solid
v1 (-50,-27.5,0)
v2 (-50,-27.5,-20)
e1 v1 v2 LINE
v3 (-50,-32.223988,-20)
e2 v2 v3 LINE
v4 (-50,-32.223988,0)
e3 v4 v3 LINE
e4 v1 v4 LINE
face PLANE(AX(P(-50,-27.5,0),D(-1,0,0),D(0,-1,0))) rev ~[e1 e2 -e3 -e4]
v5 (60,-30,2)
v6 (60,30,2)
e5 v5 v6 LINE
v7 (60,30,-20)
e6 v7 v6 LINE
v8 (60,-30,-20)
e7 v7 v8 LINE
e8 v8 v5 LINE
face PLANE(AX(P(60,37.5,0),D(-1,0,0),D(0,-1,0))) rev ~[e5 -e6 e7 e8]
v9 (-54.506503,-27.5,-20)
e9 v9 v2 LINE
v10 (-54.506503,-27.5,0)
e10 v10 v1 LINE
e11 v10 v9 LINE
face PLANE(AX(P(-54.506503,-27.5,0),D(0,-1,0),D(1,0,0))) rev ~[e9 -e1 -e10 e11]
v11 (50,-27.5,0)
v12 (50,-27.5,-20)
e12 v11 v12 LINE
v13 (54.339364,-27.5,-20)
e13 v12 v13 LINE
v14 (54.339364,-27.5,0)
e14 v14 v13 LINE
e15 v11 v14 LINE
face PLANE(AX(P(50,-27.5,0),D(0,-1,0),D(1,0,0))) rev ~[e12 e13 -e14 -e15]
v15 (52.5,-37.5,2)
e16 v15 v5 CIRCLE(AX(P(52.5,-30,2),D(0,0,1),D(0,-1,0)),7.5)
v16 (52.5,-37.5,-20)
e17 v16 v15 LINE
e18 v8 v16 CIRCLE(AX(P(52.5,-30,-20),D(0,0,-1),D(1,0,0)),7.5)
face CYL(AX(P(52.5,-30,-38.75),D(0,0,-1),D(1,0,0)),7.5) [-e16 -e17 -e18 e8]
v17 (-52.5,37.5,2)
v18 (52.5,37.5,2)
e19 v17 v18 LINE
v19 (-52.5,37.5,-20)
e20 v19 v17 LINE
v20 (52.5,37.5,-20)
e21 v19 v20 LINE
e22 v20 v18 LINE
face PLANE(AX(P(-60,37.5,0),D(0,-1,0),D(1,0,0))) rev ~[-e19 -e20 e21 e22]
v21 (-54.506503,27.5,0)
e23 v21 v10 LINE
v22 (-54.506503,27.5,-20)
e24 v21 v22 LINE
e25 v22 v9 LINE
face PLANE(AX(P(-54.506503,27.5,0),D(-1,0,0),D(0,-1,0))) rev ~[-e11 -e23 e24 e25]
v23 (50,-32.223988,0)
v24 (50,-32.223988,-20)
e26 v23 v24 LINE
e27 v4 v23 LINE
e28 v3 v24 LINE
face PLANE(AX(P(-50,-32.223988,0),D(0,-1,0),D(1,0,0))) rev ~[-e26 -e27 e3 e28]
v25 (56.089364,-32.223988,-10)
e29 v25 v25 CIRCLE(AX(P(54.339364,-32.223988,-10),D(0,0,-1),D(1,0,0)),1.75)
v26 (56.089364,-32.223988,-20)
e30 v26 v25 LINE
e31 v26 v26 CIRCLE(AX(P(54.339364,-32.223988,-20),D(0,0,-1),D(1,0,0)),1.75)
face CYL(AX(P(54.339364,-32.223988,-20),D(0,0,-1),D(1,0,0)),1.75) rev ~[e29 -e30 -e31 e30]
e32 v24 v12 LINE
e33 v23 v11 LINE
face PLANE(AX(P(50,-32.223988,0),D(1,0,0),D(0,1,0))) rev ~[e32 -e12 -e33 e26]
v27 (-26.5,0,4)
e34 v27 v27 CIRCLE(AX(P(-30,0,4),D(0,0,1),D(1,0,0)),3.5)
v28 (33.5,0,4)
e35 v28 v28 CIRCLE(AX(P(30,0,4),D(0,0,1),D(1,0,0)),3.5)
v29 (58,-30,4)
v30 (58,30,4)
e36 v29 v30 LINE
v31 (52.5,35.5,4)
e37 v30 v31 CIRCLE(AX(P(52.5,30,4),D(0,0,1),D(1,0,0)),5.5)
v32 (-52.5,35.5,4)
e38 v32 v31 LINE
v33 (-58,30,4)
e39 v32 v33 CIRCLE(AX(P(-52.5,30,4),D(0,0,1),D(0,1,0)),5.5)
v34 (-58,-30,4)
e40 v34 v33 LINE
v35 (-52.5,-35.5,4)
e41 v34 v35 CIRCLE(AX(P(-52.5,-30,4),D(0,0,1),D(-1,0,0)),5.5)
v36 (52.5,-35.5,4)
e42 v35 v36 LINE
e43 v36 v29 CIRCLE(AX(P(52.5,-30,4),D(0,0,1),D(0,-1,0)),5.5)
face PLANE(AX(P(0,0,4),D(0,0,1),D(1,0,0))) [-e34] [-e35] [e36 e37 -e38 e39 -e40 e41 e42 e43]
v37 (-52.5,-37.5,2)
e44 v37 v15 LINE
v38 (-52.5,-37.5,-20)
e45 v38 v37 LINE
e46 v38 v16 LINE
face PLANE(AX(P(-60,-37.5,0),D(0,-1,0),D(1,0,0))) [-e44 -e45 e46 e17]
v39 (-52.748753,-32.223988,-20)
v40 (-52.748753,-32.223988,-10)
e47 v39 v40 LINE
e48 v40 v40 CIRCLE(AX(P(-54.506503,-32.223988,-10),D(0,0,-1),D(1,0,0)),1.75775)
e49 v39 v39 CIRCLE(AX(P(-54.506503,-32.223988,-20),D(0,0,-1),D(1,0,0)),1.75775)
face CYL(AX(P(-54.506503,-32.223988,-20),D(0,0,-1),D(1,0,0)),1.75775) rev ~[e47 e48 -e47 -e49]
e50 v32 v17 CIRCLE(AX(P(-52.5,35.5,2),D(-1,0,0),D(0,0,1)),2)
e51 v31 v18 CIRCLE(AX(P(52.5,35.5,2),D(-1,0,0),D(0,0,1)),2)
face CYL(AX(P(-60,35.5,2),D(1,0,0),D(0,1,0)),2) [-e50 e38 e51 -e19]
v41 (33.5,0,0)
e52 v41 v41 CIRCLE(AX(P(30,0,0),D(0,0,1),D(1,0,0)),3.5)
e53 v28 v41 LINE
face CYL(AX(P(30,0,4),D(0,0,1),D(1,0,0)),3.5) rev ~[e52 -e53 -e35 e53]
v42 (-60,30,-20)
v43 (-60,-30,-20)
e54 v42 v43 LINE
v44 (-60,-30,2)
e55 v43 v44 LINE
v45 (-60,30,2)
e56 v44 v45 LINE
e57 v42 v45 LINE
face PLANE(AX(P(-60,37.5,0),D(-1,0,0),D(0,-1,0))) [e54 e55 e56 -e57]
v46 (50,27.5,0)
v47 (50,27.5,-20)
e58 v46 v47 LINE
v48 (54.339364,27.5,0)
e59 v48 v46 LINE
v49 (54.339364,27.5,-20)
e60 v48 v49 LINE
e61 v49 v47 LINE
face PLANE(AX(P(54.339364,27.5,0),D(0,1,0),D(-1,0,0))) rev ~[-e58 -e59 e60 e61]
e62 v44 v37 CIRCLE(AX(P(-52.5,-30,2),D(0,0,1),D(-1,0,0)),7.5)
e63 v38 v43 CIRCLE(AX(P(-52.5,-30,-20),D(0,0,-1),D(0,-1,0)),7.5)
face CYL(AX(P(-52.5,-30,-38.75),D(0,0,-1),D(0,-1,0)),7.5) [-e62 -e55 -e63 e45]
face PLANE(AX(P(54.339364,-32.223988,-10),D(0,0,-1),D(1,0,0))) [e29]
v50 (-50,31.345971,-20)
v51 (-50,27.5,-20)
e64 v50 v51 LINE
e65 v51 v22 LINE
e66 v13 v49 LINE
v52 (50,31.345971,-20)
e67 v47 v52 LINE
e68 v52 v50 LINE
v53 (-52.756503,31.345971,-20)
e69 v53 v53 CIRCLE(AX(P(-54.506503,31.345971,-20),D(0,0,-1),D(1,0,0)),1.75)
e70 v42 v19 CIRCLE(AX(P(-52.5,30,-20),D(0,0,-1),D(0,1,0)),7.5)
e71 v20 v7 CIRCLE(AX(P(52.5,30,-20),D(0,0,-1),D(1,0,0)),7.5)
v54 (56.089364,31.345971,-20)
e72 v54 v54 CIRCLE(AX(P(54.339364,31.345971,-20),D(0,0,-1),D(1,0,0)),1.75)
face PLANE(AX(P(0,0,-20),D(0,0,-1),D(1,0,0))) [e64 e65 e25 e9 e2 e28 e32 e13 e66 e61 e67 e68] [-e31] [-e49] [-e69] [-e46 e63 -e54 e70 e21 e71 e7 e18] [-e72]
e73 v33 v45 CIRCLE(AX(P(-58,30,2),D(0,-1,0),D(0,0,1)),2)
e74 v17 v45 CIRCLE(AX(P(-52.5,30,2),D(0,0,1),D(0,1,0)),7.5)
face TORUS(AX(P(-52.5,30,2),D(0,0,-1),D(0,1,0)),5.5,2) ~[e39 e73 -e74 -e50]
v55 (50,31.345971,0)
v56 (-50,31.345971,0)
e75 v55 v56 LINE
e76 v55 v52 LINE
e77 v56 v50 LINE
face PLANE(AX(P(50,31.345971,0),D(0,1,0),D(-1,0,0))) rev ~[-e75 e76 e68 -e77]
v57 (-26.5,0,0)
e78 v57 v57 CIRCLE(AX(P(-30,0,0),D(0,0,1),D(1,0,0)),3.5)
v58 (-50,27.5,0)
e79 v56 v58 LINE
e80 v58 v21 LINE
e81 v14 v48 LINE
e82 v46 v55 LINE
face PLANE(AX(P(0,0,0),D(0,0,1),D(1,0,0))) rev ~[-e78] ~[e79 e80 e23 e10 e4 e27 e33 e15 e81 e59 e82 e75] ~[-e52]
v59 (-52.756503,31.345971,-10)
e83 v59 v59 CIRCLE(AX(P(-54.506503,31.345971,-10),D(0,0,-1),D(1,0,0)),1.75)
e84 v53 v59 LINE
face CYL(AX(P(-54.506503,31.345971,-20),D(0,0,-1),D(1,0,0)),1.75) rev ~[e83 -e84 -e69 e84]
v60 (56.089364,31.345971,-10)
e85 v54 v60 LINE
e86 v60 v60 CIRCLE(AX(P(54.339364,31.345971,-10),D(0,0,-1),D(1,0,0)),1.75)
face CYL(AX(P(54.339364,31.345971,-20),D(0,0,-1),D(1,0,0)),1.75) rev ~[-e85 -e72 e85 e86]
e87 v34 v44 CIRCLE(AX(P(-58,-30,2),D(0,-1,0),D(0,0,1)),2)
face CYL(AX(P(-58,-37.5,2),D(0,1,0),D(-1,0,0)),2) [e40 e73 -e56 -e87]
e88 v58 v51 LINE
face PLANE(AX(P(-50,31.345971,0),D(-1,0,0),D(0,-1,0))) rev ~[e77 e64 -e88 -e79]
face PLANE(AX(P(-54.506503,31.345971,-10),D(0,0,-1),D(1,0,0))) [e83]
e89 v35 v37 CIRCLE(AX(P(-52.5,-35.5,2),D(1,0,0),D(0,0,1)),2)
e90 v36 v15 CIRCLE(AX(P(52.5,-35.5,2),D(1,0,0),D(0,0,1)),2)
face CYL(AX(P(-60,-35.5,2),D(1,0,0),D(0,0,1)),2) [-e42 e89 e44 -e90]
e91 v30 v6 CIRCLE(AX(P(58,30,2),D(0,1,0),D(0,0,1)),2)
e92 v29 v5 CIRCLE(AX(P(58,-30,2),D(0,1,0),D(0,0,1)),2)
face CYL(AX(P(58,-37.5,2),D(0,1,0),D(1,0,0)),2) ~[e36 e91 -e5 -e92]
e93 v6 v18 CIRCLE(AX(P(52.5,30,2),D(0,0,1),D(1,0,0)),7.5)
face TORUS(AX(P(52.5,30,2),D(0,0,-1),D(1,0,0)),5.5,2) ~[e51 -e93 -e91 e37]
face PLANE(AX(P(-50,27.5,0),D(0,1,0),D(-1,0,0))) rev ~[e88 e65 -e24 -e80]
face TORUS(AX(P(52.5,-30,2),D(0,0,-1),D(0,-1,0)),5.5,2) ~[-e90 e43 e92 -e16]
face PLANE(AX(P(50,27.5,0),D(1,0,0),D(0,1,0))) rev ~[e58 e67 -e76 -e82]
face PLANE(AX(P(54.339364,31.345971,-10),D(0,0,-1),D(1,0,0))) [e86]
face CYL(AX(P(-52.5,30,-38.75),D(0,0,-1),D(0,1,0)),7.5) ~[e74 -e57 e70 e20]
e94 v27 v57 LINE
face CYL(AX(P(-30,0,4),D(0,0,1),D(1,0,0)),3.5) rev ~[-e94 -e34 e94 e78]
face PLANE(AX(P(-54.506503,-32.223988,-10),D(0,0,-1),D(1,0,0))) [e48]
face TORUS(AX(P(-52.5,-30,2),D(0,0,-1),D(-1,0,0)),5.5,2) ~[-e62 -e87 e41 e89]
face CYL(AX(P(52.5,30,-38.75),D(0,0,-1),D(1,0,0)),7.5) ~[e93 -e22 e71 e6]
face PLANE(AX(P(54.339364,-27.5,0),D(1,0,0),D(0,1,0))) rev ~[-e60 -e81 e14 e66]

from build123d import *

# Parameters (mm, degrees)
F0_W         = 120
F0_H         = 75
F1_DEPTH     = 4
F2_W         = 120
F2_H         = 75
F3_DEPTH     = 20
F4_R         = 2
F5_T1_DEPTH  = 42.75
F5_T4_ANGLE  = 90
F5_T6_ANGLE  = 90
F5_T8_ANGLE  = 90
F5_T10_ANGLE = 90
F6_R         = 3.5
F7_DEPTH     = 25
F8_R         = 1.7577503979
F8_R_2       = 1.75
F9_DEPTH     = 10


# Not quite as in the source:
# - a fillet or chamfer that OpenCascade refuses, or shapes differently, is made with other operations: its cross-section is extruded or revolved along the edge and cut away or added


with BuildPart() as f1:
    # F0 (on Top) → F1 (new body)
    with BuildSketch(Plane.XY):
        Rectangle(F0_W, F0_H)
    extrude(amount=F1_DEPTH)

    # F2 (on face) → F3 (join)
    with BuildSketch(Plane(origin=(0, 0, 0), x_dir=(1, 0, 0), z_dir=(0, 0, -1))):
        Rectangle(F2_W, F2_H)
        Polygon((54.339364171, -27.5), (50, -27.5), (50, -31.3459709287), (-50, -31.3459709287), (-50, -27.5), (-54.5065030456, -27.5), (-54.5065030456, 27.5), (-50, 27.5), (-50, 32.2239883244), (50, 32.2239883244), (50, 27.5), (54.339364171, 27.5), align=None, mode=Mode.SUBTRACT)
    extrude(amount=F3_DEPTH)

    # F4
    f4_edges = [f1.edges().sort_by_distance(p)[0] for p in [
        (60, 0, 4),
        (0, -37.5, 4),
        (-60, 0, 4),
        (0, 37.5, 4),
    ]]
    fillet(f4_edges, radius=F4_R)

    # F5: fillet of radius 7.5 on 4 edges, made by hand

    # F5_s2 → F5_t1 (cut)
    with BuildSketch(Plane.XY.offset(-38.75)):
        with BuildLine():
            ThreePointArc((60, -30), (57.8033008589, -35.3033008589), (52.5, -37.5))
            Line((52.5, -37.5), (60, -37.5))
            Line((60, -37.5), (60, -30))
        make_face()
        with BuildLine():
            ThreePointArc((60, 30), (57.8033008589, 35.3033008589), (52.5, 37.5))
            Line((52.5, 37.5), (60, 37.5))
            Line((60, 37.5), (60, 30))
        make_face()
        with BuildLine():
            ThreePointArc((-52.5, -37.5), (-57.8033008589, -35.3033008589), (-60, -30))
            Line((-60, -30), (-60, -37.5))
            Line((-60, -37.5), (-52.5, -37.5))
        make_face()
        with BuildLine():
            ThreePointArc((-52.5, 37.5), (-57.8033008589, 35.3033008589), (-60, 30))
            Line((-60, 30), (-60, 37.5))
            Line((-60, 37.5), (-52.5, 37.5))
        make_face()
    extrude(amount=F5_T1_DEPTH, mode=Mode.SUBTRACT)

    # F5_s3 → F5_t4 (revolve, cut)
    with BuildSketch(Plane.YZ.offset(-52.5)):
        with BuildLine():
            ThreePointArc((35.5, 4), (36.9142135624, 3.4142135624), (37.5, 2))
            Line((37.5, 2), (37.5, 4))
            Line((37.5, 4), (35.5, 4))
        make_face()
    revolve(axis=Axis((-52.5, 30, 4), (0, 0, 1)), revolution_arc=F5_T4_ANGLE, mode=Mode.SUBTRACT)

    # F5_s5 → F5_t6 (revolve, cut)
    with BuildSketch(Plane.XZ.offset(30)):
        with BuildLine():
            ThreePointArc((-58, 4), (-59.4142135624, 3.4142135624), (-60, 2))
            Line((-60, 2), (-60, 4))
            Line((-60, 4), (-58, 4))
        make_face()
    revolve(axis=Axis((-52.5, -30, 4), (0, 0, 1)), revolution_arc=F5_T6_ANGLE, mode=Mode.SUBTRACT)

    # F5_s7 → F5_t8 (revolve, cut)
    with BuildSketch(Plane.XZ.offset(-30)):
        with BuildLine():
            ThreePointArc((58, 4), (59.4142135624, 3.4142135624), (60, 2))
            Line((60, 2), (60, 4))
            Line((60, 4), (58, 4))
        make_face()
    revolve(axis=Axis((52.5, 30, 4), (0, 0, 1)), revolution_arc=F5_T8_ANGLE, mode=Mode.SUBTRACT)

    # F5_s9 → F5_t10 (revolve, cut)
    with BuildSketch(Plane.YZ.offset(52.5)):
        with BuildLine():
            ThreePointArc((-35.5, 4), (-36.9142135624, 3.4142135624), (-37.5, 2))
            Line((-37.5, 2), (-37.5, 4))
            Line((-37.5, 4), (-35.5, 4))
        make_face()
    revolve(axis=Axis((52.5, -30, 4), (0, 0, 1)), revolution_arc=F5_T10_ANGLE, mode=Mode.SUBTRACT)

    # F6 (on face) → F7 (cut)
    with BuildSketch(Plane.XY.offset(4)):
        with Locations((-30, 0)):
            Circle(F6_R)
        with Locations((30, 0)):
            Circle(F6_R)
    extrude(amount=-F7_DEPTH, mode=Mode.SUBTRACT)

    # F8 (on face) → F9 (cut)
    with BuildSketch(Plane(origin=(0, 0, -20), x_dir=(1, 0, 0), z_dir=(0, 0, -1))):
        with Locations((-54.5065030456, 32.2239883244)):
            Circle(F8_R)
        with Locations((54.339364171, 32.2239883244)):
            Circle(F8_R_2)
        with Locations((54.339364171, -31.3459709287)):
            Circle(F8_R_2)
        with Locations((-54.5065030456, -31.3459709287)):
            Circle(F8_R_2)
    extrude(amount=-F9_DEPTH, mode=Mode.SUBTRACT)


solid = f1.part
